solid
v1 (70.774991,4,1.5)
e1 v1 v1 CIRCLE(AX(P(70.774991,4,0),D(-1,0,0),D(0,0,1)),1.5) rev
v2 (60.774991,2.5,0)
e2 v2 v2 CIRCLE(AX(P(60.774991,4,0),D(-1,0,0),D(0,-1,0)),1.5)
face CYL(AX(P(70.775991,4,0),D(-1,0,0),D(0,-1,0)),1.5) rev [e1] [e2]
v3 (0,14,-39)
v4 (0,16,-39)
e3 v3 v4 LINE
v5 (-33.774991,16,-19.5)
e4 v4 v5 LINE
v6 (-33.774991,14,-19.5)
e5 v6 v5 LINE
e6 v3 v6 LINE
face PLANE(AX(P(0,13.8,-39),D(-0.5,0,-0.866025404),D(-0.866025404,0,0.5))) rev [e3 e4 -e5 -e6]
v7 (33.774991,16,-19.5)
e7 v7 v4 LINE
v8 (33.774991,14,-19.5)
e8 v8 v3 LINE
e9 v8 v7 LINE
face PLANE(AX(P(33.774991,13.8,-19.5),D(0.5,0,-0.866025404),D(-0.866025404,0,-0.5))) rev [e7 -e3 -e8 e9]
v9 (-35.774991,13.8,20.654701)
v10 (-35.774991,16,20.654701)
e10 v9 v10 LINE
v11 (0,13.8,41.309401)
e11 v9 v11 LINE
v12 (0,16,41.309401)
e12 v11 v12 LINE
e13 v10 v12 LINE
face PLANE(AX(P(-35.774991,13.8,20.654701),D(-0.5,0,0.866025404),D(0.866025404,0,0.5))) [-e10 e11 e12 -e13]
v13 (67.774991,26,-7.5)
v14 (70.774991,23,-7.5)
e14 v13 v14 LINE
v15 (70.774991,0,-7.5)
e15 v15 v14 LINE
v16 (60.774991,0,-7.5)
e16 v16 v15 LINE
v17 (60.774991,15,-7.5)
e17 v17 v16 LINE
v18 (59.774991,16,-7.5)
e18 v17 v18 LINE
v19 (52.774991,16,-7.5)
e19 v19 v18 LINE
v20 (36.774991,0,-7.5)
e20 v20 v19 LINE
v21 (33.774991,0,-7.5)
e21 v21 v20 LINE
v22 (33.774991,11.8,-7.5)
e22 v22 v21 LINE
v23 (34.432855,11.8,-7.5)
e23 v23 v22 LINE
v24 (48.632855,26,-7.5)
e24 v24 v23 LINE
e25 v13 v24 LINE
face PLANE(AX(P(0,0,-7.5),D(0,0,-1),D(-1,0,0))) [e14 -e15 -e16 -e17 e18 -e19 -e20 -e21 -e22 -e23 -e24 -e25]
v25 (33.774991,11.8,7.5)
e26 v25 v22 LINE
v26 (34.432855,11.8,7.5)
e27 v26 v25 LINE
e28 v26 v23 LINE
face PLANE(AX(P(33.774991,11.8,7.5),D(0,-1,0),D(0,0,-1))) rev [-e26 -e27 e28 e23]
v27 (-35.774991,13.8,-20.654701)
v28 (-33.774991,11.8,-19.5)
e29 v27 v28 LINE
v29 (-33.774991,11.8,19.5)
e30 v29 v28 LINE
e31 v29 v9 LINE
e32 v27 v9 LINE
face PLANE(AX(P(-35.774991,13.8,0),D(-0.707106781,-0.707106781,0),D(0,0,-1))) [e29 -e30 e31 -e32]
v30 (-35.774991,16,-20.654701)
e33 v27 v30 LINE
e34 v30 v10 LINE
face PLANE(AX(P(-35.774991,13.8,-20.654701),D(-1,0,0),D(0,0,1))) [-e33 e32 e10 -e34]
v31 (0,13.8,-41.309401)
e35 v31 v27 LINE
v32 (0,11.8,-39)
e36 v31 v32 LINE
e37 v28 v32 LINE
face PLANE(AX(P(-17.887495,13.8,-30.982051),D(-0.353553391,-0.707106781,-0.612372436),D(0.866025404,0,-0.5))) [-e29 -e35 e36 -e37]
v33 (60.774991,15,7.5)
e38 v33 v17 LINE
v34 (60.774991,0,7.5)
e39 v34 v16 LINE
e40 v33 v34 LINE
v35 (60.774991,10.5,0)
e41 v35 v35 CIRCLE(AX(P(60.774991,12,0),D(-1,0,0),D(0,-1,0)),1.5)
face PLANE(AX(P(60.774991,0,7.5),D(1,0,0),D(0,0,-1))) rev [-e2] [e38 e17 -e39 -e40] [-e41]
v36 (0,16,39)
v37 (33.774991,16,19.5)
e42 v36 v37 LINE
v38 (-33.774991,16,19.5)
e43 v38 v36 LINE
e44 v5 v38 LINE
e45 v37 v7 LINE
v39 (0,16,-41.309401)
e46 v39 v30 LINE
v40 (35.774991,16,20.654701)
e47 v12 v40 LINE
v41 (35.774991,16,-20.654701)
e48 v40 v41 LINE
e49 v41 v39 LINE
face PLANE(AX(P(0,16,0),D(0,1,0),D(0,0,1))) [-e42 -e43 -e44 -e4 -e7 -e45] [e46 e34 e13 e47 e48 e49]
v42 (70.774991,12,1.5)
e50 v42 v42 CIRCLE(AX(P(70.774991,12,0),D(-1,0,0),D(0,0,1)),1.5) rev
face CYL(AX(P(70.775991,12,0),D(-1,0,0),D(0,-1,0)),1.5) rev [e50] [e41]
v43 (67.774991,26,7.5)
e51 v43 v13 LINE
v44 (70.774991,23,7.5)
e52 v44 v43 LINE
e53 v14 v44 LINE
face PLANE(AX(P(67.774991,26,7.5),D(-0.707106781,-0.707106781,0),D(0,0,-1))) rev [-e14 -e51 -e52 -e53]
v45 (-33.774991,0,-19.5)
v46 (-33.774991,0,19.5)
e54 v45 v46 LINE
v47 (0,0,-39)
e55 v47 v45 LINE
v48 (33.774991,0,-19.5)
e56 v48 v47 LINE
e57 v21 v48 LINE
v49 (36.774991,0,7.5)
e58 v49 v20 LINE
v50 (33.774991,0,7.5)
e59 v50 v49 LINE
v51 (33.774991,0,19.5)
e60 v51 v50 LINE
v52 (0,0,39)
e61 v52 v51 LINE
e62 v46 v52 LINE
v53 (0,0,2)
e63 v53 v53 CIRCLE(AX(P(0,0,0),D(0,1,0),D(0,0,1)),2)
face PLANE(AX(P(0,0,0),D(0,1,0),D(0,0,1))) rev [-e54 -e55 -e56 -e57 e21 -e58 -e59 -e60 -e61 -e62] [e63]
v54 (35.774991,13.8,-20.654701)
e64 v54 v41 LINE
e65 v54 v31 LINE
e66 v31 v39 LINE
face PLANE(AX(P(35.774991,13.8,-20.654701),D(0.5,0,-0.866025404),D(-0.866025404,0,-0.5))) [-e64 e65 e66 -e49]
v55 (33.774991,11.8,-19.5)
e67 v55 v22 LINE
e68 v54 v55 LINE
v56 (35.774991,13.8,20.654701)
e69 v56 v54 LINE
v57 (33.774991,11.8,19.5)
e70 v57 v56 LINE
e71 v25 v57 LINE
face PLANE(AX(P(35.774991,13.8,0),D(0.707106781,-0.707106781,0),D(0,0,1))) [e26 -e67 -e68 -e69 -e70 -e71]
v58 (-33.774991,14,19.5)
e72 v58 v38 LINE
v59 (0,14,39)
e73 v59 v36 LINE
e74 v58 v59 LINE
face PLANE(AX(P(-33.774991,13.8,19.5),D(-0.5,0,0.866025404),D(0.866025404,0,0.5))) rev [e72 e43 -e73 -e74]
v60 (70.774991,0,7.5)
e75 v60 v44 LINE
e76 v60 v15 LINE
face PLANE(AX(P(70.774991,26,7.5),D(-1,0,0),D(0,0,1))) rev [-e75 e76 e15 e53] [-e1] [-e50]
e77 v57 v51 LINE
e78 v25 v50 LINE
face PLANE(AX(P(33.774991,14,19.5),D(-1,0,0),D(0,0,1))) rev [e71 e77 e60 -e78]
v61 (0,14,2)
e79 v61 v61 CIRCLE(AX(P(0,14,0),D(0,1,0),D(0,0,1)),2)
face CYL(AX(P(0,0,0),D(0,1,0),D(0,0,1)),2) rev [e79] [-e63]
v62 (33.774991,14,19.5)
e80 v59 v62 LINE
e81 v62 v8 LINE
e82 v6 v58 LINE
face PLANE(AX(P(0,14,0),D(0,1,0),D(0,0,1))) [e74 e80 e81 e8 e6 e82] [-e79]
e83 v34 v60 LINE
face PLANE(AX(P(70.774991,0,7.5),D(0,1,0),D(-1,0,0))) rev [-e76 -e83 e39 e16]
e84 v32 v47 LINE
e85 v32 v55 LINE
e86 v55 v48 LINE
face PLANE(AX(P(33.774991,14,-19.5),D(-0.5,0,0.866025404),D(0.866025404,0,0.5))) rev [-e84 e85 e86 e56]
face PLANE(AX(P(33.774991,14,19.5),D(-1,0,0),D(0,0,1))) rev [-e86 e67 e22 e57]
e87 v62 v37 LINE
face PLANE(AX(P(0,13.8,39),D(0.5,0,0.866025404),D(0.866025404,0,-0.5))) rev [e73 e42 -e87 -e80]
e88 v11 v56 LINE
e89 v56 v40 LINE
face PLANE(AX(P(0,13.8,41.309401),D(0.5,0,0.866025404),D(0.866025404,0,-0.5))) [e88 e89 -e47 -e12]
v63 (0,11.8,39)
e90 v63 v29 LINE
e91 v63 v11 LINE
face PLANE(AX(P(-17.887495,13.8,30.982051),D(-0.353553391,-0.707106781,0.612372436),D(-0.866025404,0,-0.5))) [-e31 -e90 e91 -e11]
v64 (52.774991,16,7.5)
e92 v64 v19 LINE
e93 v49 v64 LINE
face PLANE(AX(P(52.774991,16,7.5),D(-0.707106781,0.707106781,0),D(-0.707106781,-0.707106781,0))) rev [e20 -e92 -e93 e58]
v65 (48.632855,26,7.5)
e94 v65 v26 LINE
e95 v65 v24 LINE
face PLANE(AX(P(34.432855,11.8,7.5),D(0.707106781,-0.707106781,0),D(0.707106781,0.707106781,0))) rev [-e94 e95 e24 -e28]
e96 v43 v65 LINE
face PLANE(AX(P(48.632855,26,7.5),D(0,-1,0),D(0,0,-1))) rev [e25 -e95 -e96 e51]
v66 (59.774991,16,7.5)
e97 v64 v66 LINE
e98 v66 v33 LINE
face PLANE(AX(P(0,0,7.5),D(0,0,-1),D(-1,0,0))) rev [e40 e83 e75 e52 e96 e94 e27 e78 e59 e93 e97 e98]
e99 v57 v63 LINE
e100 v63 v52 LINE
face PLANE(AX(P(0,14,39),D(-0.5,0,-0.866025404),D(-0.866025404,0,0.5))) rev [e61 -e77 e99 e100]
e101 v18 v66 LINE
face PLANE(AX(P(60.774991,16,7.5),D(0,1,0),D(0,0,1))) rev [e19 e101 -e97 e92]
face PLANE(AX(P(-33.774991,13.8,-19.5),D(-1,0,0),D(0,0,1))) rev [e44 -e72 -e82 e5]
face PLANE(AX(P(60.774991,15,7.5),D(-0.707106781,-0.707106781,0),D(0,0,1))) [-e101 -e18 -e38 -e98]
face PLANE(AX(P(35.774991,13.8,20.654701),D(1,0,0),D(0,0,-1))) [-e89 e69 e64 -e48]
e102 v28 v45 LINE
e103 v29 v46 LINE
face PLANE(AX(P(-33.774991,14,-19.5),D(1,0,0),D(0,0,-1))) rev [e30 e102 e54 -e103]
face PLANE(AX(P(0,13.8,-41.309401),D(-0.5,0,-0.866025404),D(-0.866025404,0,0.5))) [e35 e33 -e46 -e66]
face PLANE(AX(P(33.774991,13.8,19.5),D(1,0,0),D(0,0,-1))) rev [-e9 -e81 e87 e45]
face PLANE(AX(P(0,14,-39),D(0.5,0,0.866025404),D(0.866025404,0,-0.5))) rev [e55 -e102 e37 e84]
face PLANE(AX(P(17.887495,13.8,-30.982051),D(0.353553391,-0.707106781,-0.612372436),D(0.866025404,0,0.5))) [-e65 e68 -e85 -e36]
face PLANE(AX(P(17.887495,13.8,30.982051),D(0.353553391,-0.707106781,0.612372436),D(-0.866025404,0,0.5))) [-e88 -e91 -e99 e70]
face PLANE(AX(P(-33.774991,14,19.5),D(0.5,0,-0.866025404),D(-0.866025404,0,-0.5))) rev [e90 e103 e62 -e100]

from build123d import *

# Parameters (mm, degrees)
BOSS_EXTRUDE1_DEPTH      = 14
BOSS_EXTRUDE2_DEPTH      = 2
BOSS_EXTRUDE2_DEPTH_BACK = 0.2
CHAMFER1_SIZE            = 2
SKETCH3_R                = 2
CUT_EXTRUDE1_DEPTH       = 57.412025139
BOSS_EXTRUDE3_DEPTH      = 7.5
CUT_EXTRUDE2_REACH       = 110.187
SKETCH6_R                = 1.5
CHAMFER2_SIZE            = 1
CHAMFER3_SIZE            = 3


with BuildPart() as part:
    # Sketch1 → Boss-Extrude1 (new body)
    with BuildSketch(Plane(origin=(0, 0, 0), x_dir=(1, 0, 0), z_dir=(0, 1, 0))):
        Polygon((33.774990748, 19.5), (0, 39), (-33.774990748, 19.5), (-33.774990748, -19.5), (0, -39), (33.774990748, -19.5), align=None)
    extrude(amount=BOSS_EXTRUDE1_DEPTH)

    # Sketch2 → Boss-Extrude2 (add, two sides: drawn at the far end of the back side and taken through both)
    with BuildSketch(Plane(origin=(0, 14, 0), x_dir=(1, 0, 0), z_dir=(0, 1, 0)).offset(-BOSS_EXTRUDE2_DEPTH_BACK)):
        Polygon((0, 41.309401077), (-35.774990748, 20.654700538), (-35.774990748, -20.654700538), (0, -41.309401077), (35.774990748, -20.654700538), (35.774990748, 20.654700538), align=None)
        Polygon((33.774990748, -19.5), (33.774990748, 19.5), (0, 39), (-33.774990748, 19.5), (-33.774990748, -19.5), (0, -39), align=None, mode=Mode.SUBTRACT)
    extrude(amount=BOSS_EXTRUDE2_DEPTH + BOSS_EXTRUDE2_DEPTH_BACK)

    # Chamfer1
    chamfer1_edges = [part.edges().sort_by_distance(p)[0] for p in [
        (-16.887495374, 13.8, 29.25),
        (16.887495374, 13.8, 29.25),
        (33.774990748, 13.8, 0),
        (16.887495374, 13.8, -29.25),
        (-16.887495374, 13.8, -29.25),
        (-33.774990748, 13.8, 0),
    ]]
    chamfer(chamfer1_edges, length=CHAMFER1_SIZE - 0.0001)  # a hair under: the kernel refuses the full size

    # Sketch3 → Cut-Extrude1 (cut, through all)
    with BuildSketch(Plane(origin=(0, 14, 0), x_dir=(1, 0, 0), z_dir=(0, 1, 0))):
        with Locations(Location((0, 0, 0), (0, 0, 270))):
            Circle(SKETCH3_R)
    extrude(amount=-CUT_EXTRUDE1_DEPTH, mode=Mode.SUBTRACT)

    # Sketch5 → Boss-Extrude3 (add, symmetric)
    with BuildSketch(Plane.XY):
        Polygon((33.774990748, 11.8), (34.432855124, 11.8), (48.632855124, 26), (70.774990748, 26), (70.774990748, 0), (60.774990748, 0), (60.774990748, 16), (52.774990748, 16), (36.774990748, 0), (33.774990748, 0), align=None)
    extrude(amount=BOSS_EXTRUDE3_DEPTH, both=True)

    # Sketch6 → Cut-Extrude2 (cut, up to next)
    with BuildSketch(Plane.ZY.offset(-60.774990748), mode=Mode.PRIVATE) as cut_extrude2_sk1:
        with Locations(Location((0, 12, 0), (0, 0, 270))):
            Circle(SKETCH6_R)
    cut_extrude2_tool1 = extrude(cut_extrude2_sk1.sketch, amount=-CUT_EXTRUDE2_REACH, mode=Mode.PRIVATE) & part.part
    # Sketch6 → Cut-Extrude2 (cut, up to next)
    with BuildSketch(Plane.ZY.offset(-60.774990748), mode=Mode.PRIVATE) as cut_extrude2_sk2:
        with Locations(Location((0, 4, 0), (0, 0, 270))):
            Circle(SKETCH6_R)
    cut_extrude2_tool2 = extrude(cut_extrude2_sk2.sketch, amount=-CUT_EXTRUDE2_REACH, mode=Mode.PRIVATE) & part.part
    add(cut_extrude2_tool1.solids().sort_by_distance((60.774991, 12, 0))[0], mode=Mode.SUBTRACT)
    add(cut_extrude2_tool2.solids().sort_by_distance((60.774991, 4, 0))[0], mode=Mode.SUBTRACT)

    # Chamfer2
    chamfer2_edges = [part.edges().sort_by_distance(p)[0] for p in [
        (60.774990748, 16, 0),
    ]]
    chamfer(chamfer2_edges, length=CHAMFER2_SIZE)

    # Chamfer3
    chamfer3_edges = [part.edges().sort_by_distance(p)[0] for p in [
        (70.774990748, 26, 0),
    ]]
    chamfer(chamfer3_edges, length=CHAMFER3_SIZE)


solid = part.part
